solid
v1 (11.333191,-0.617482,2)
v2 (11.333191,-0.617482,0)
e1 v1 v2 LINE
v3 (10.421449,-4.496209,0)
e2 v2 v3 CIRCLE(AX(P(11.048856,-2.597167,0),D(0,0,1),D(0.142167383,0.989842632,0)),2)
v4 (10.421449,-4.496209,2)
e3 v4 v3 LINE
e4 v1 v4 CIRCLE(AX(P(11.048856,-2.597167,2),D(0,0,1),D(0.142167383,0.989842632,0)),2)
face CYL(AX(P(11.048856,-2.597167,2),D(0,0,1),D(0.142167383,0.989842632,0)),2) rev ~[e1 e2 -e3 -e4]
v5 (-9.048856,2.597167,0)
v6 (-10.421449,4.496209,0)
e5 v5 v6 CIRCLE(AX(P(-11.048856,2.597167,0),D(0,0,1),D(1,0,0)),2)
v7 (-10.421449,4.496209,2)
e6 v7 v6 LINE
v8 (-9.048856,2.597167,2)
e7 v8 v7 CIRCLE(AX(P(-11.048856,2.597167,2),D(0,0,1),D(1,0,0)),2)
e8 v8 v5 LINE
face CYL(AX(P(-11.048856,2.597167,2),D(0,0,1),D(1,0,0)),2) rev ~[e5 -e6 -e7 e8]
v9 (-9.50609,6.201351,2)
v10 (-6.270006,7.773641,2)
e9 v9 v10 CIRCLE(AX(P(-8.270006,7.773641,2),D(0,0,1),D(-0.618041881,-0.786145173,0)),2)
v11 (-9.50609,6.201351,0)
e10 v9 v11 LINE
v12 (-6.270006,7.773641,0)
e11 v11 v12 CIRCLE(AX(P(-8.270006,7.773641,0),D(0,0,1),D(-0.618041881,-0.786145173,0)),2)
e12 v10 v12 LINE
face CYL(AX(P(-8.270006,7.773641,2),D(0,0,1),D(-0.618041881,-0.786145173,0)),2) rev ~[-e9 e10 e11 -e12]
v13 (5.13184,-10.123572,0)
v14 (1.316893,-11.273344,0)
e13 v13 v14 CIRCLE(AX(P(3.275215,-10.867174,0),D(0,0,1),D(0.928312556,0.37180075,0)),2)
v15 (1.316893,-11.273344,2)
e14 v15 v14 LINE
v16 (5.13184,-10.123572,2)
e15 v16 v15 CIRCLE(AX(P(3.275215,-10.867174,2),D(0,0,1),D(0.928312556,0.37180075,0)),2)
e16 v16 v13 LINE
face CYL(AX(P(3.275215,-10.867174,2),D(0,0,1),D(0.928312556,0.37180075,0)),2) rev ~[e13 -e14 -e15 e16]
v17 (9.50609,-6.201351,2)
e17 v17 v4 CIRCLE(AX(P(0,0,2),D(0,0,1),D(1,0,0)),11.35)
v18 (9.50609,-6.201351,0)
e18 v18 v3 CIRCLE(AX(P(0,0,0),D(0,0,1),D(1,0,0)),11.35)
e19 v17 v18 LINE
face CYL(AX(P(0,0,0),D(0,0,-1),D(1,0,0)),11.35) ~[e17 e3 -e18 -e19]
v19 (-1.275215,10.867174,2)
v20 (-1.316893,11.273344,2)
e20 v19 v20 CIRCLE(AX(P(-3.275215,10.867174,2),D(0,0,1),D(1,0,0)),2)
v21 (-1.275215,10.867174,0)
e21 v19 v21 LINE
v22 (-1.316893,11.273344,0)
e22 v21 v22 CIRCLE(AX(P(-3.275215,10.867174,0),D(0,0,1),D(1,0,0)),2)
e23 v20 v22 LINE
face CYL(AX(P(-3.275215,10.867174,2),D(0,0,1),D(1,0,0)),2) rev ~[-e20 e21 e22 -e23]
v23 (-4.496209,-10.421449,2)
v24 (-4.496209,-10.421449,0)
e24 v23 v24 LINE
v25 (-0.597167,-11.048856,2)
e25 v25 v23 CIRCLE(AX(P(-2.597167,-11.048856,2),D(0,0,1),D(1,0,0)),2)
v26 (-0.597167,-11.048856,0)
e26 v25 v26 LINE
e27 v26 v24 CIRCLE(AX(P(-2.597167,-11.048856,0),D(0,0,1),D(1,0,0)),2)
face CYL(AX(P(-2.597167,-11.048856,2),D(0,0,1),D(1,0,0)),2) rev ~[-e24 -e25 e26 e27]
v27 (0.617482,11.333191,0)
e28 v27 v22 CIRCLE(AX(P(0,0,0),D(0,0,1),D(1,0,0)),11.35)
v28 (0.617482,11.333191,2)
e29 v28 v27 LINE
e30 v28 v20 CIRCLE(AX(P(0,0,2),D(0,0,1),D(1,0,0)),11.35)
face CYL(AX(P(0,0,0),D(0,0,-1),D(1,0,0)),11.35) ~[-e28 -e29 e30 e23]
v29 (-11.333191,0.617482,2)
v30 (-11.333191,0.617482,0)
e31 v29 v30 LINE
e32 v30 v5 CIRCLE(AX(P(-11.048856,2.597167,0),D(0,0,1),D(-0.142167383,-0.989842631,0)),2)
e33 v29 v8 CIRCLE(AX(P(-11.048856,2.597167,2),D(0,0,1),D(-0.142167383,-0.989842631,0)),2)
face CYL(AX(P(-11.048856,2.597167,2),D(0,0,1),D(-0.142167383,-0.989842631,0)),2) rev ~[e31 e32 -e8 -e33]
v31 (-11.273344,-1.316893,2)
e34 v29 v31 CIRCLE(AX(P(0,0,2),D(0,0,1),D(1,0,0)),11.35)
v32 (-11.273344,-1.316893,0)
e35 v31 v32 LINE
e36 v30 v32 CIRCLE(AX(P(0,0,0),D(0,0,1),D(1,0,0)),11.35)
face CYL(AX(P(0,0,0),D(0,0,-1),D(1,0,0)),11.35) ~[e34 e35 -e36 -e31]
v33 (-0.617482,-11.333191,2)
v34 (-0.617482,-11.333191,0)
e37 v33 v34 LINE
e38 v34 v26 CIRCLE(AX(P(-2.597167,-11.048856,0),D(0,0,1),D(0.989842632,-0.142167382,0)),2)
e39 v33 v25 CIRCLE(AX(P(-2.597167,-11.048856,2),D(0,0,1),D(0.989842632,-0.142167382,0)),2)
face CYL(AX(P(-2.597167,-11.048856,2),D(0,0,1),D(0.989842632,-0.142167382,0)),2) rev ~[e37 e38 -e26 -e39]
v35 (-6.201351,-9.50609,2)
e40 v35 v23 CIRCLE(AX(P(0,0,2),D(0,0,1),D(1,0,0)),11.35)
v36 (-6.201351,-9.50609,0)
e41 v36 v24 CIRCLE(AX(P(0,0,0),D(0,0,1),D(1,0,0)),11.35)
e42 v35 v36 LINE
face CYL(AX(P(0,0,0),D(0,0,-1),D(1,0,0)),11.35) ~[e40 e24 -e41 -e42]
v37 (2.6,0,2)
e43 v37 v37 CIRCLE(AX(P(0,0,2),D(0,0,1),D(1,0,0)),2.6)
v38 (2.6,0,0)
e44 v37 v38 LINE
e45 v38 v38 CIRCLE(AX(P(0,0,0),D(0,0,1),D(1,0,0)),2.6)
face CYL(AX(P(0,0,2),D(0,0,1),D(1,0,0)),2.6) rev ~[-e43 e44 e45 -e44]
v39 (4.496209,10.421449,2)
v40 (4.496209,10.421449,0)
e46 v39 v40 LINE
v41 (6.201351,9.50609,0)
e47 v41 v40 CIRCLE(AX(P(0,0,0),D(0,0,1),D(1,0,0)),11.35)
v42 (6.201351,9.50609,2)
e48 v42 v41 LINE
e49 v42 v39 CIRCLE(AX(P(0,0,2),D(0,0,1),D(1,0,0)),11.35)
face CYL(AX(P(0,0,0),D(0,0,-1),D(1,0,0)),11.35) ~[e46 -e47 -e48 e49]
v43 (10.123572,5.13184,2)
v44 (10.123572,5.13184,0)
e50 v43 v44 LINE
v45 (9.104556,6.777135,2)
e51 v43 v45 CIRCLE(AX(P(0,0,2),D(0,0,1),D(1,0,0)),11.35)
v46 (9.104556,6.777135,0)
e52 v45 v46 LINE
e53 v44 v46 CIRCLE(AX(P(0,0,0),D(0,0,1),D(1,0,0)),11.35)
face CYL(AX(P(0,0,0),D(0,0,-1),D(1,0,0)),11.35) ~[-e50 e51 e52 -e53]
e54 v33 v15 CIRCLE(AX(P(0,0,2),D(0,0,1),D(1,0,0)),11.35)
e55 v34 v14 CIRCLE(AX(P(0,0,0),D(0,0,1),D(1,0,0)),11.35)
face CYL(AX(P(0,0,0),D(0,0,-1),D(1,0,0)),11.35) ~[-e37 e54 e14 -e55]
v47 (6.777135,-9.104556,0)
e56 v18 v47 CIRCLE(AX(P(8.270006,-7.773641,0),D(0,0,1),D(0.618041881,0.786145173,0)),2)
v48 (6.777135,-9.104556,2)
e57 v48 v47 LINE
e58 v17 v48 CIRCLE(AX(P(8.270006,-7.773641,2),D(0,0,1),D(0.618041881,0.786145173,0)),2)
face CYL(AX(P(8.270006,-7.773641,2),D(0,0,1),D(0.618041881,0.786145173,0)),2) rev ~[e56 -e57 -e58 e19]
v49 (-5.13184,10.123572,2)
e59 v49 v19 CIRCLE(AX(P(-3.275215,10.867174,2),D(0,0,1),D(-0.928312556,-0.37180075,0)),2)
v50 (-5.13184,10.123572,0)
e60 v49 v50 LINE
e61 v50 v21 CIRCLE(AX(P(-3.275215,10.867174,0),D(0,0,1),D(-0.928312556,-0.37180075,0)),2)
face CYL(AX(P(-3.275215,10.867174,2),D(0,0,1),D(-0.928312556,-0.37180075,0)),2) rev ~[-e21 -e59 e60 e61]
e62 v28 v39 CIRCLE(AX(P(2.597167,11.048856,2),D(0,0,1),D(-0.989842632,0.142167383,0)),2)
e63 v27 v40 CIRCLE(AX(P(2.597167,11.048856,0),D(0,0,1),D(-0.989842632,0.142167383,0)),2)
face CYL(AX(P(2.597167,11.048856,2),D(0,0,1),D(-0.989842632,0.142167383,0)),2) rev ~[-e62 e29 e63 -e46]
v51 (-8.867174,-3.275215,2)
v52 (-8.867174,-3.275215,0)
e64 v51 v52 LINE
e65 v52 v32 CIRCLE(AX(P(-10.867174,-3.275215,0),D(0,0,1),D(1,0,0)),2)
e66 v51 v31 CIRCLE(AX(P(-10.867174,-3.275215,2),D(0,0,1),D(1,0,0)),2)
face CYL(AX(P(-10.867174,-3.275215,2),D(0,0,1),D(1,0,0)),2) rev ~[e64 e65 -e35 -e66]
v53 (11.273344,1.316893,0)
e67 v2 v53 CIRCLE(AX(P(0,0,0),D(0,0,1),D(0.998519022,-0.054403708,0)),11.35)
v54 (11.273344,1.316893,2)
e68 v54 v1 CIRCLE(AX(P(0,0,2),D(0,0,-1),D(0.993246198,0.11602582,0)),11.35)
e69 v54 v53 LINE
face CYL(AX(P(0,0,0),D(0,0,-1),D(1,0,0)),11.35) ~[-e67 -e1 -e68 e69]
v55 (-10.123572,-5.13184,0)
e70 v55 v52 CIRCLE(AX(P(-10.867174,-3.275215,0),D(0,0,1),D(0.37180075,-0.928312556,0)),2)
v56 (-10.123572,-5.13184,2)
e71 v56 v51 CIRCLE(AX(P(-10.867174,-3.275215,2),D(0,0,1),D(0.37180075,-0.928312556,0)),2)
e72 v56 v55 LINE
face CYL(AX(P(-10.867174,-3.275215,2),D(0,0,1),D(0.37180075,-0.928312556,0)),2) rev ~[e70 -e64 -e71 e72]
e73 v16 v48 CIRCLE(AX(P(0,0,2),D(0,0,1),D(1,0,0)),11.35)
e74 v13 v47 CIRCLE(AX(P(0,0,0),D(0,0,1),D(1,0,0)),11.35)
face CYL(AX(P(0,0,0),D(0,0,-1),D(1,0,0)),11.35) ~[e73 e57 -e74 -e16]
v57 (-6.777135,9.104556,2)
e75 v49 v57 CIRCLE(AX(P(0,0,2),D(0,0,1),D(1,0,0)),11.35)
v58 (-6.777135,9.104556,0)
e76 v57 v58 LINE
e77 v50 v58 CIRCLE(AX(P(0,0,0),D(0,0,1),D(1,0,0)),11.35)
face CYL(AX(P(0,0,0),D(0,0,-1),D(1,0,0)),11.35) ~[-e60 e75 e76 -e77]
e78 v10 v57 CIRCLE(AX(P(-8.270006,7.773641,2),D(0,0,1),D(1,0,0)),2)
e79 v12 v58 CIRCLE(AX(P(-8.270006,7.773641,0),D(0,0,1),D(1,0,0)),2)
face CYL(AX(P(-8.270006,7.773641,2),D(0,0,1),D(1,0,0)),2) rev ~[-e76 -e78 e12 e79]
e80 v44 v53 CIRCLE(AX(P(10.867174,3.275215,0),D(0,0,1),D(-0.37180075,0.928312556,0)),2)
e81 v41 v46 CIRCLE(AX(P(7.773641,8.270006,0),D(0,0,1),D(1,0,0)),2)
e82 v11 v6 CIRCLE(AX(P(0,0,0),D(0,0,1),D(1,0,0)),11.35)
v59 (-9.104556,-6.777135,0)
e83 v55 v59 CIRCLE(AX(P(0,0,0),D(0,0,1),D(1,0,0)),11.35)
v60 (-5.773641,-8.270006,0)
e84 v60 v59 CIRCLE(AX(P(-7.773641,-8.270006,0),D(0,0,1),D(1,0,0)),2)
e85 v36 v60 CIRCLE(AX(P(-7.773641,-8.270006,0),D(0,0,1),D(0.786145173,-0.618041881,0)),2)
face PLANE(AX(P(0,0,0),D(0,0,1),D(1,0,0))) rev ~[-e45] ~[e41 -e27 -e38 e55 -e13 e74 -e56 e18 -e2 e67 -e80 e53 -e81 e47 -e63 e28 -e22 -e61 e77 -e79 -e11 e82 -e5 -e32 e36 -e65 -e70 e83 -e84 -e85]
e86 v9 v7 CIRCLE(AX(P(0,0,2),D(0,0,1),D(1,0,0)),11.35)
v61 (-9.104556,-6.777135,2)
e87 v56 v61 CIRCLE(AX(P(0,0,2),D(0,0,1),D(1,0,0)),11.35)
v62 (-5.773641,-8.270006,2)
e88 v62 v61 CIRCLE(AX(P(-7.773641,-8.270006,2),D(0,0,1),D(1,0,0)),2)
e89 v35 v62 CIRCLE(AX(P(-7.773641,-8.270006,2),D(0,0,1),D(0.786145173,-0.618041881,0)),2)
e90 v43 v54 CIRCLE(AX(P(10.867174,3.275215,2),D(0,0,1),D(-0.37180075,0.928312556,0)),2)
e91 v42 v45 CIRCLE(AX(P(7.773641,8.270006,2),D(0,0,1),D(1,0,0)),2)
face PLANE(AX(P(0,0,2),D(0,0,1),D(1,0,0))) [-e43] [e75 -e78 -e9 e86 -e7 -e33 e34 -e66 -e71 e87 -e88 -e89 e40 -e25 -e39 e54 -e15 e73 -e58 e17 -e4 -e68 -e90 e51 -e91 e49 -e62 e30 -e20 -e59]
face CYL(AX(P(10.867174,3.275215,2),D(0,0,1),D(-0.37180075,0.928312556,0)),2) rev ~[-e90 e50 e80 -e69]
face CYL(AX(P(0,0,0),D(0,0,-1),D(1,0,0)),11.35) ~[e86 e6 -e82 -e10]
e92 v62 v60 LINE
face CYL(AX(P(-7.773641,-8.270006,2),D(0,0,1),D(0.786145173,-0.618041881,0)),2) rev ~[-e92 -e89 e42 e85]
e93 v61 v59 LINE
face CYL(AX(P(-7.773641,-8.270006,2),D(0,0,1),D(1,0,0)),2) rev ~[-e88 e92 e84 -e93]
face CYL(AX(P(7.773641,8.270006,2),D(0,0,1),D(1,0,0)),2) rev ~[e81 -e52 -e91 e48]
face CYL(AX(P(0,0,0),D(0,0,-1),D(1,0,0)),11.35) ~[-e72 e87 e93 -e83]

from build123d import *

# Parameters (mm, degrees)
F0_R     = 11.35
F1_DEPTH = 2
F2_R     = 2.6
F3_DEPTH = 25


# Not quite as in the source:
# - a feature names something its author has since deleted; it is built from what else it names


with BuildPart() as f1:
    # F0 (on Top) → F1 (new body)
    with BuildSketch(Plane.XY):
        Circle(F0_R)
    extrude(amount=F1_DEPTH)

    # F2 (on face) → F3 (cut)
    with BuildSketch(Plane.XY.offset(2)):
        with BuildLine():
            ThreePointArc((9.1045560576, 6.7771350137), (7.7736409673, 8.2700064155), (6.2013506213, 9.506090178))
            ThreePointArc((6.2013506213, 9.506090178), (6.4038363916, 6.8127365625), (9.1045560576, 6.7771350137))
        make_face()
        with BuildLine():
            ThreePointArc((9.1045560576, 6.7771350137), (9.5987204424, 7.4520303097), (9.7736409673, 8.2700064155))
            ThreePointArc((9.7736409673, 8.2700064155), (8.4276361156, 10.1600567709), (6.2013506213, 9.506090178))
            ThreePointArc((6.2013506213, 9.506090178), (7.7736409673, 8.2700064155), (9.1045560576, 6.7771350137))
        make_face()
        with BuildLine():
            ThreePointArc((0.6174820868, 11.3331908954), (2.1395167155, 9.1019211282), (4.4962093293, 10.4214491155))
            ThreePointArc((4.4962093293, 10.4214491155), (2.5971673498, 11.0488561289), (0.6174820868, 11.3331908954))
        make_face()
        with BuildLine():
            ThreePointArc((0.6174820868, 11.3331908954), (2.5971673498, 11.0488561289), (4.4962093293, 10.4214491155))
            ThreePointArc((4.4962093293, 10.4214491155), (4.5717665445, 10.73111721), (4.5971673498, 11.0488561289))
            ThreePointArc((4.5971673498, 11.0488561289), (2.7396971257, 13.04377098), (0.6174820868, 11.3331908954))
        make_face()
        with BuildLine():
            ThreePointArc((-5.1318402741, 10.1235722648), (-3.2752151616, 10.8671737653), (-1.3168930579, 11.2733443429))
            ThreePointArc((-1.3168930579, 11.2733443429), (-3.8523455866, 12.7820942526), (-5.1318402741, 10.1235722648))
        make_face()
        with BuildLine():
            ThreePointArc((-1.2752151616, 10.8671737653), (-1.2856619194, 11.0713254155), (-1.3168930579, 11.2733443429))
            ThreePointArc((-1.3168930579, 11.2733443429), (-3.2752151616, 10.8671737653), (-5.1318402741, 10.1235722648))
            ThreePointArc((-5.1318402741, 10.1235722648), (-2.8965663963, 8.9033445689), (-1.2752151616, 10.8671737653))
        make_face()
        with BuildLine():
            ThreePointArc((-9.506090178, 6.2013506213), (-8.2700064155, 7.7736409673), (-6.7771350137, 9.1045560576))
            ThreePointArc((-6.7771350137, 9.1045560576), (-9.7272762684, 9.143445543), (-9.506090178, 6.2013506213))
        make_face()
        with BuildLine():
            ThreePointArc((-6.2700064155, 7.7736409673), (-6.4010838912, 8.4857705891), (-6.7771350137, 9.1045560576))
            ThreePointArc((-6.7771350137, 9.1045560576), (-8.2700064155, 7.7736409673), (-9.506090178, 6.2013506213))
            ThreePointArc((-9.506090178, 6.2013506213), (-7.3959833966, 5.97472914), (-6.2700064155, 7.7736409673))
        make_face()
        with BuildLine():
            ThreePointArc((-11.3331908954, 0.6174820868), (-11.0488561289, 2.5971673498), (-10.4214491155, 4.4962093293))
            ThreePointArc((-10.4214491155, 4.4962093293), (-12.9957911296, 3.0548179842), (-11.3331908954, 0.6174820868))
        make_face()
        with BuildLine():
            ThreePointArc((-9.0488561289, 2.5971673498), (-9.427928304, 3.7687444863), (-10.4214491155, 4.4962093293))
            ThreePointArc((-10.4214491155, 4.4962093293), (-11.0488561289, 2.5971673498), (-11.3331908954, 0.6174820868))
            ThreePointArc((-11.3331908954, 0.6174820868), (-9.7390220808, 1.0857657597), (-9.0488561289, 2.5971673498))
        make_face()
        with BuildLine():
            ThreePointArc((11.2733443429, 1.3168930579), (10.8671737653, 3.2752151616), (10.1235722648, 5.1318402741))
            ThreePointArc((10.1235722648, 5.1318402741), (8.952253278, 2.6980847366), (11.2733443429, 1.3168930579))
        make_face()
        with BuildLine():
            ThreePointArc((12.8671737653, 3.2752151616), (11.9880655975, 4.9315972131), (10.1235722648, 5.1318402741))
            ThreePointArc((10.1235722648, 5.1318402741), (10.8671737653, 3.2752151616), (11.2733443429, 1.3168930579))
            ThreePointArc((11.2733443429, 1.3168930579), (12.4183573707, 2.0127455887), (12.8671737653, 3.2752151616))
        make_face()
        with BuildLine():
            ThreePointArc((10.4214491155, -4.4962093293), (11.0488561289, -2.5971673498), (11.3331908954, -0.6174820868))
            ThreePointArc((11.3331908954, -0.6174820868), (9.1019211282, -2.1395167155), (10.4214491155, -4.4962093293))
        make_face()
        with BuildLine():
            ThreePointArc((13.0488561289, -2.5971673498), (12.560257719, -1.2873333018), (11.3331908954, -0.6174820868))
            ThreePointArc((11.3331908954, -0.6174820868), (11.0488561289, -2.5971673498), (10.4214491155, -4.4962093293))
            ThreePointArc((10.4214491155, -4.4962093293), (12.2204332653, -4.2180951747), (13.0488561289, -2.5971673498))
        make_face()
        with BuildLine():
            ThreePointArc((-4.4962093293, -10.4214491155), (-3.0548179842, -12.9957911296), (-0.6174820868, -11.3331908954))
            ThreePointArc((-0.6174820868, -11.3331908954), (-2.5971673498, -11.0488561289), (-4.4962093293, -10.4214491155))
        make_face()
        with BuildLine():
            ThreePointArc((-4.4962093293, -10.4214491155), (-2.5971673498, -11.0488561289), (-0.6174820868, -11.3331908954))
            ThreePointArc((-0.6174820868, -11.3331908954), (-0.6022524988, -11.1913859047), (-0.5971673498, -11.0488561289))
            ThreePointArc((-0.5971673498, -11.0488561289), (-2.2794284309, -9.0742569343), (-4.4962093293, -10.4214491155))
        make_face()
        with BuildLine():
            ThreePointArc((-10.1235722648, -5.1318402741), (-10.8671737653, -3.2752151616), (-11.2733443429, -1.3168930579))
            ThreePointArc((-11.2733443429, -1.3168930579), (-12.7820942526, -3.8523455866), (-10.1235722648, -5.1318402741))
        make_face()
        with BuildLine():
            ThreePointArc((-8.8671737653, -3.2752151616), (-9.6047041924, -1.7240315562), (-11.2733443429, -1.3168930579))
            ThreePointArc((-11.2733443429, -1.3168930579), (-10.8671737653, -3.2752151616), (-10.1235722648, -5.1318402741))
            ThreePointArc((-10.1235722648, -5.1318402741), (-9.2107917138, -4.3961069938), (-8.8671737653, -3.2752151616))
        make_face()
        with BuildLine():
            ThreePointArc((-6.2013506213, -9.506090178), (-7.7736409673, -8.2700064155), (-9.1045560576, -6.7771350137))
            ThreePointArc((-9.1045560576, -6.7771350137), (-9.143445543, -9.7272762684), (-6.2013506213, -9.506090178))
        make_face()
        with BuildLine():
            ThreePointArc((-5.7736409673, -8.2700064155), (-6.9556648615, -6.4449269404), (-9.1045560576, -6.7771350137))
            ThreePointArc((-9.1045560576, -6.7771350137), (-7.7736409673, -8.2700064155), (-6.2013506213, -9.506090178))
            ThreePointArc((-6.2013506213, -9.506090178), (-5.8835906119, -8.9240015638), (-5.7736409673, -8.2700064155))
        make_face()
        with BuildLine():
            ThreePointArc((6.7771350137, -9.1045560576), (8.2700064155, -7.7736409673), (9.506090178, -6.2013506213))
            ThreePointArc((9.506090178, -6.2013506213), (6.8127365625, -6.4038363916), (6.7771350137, -9.1045560576))
        make_face()
        with BuildLine():
            ThreePointArc((10.2700064155, -7.7736409673), (10.0689182428, -6.8996179484), (9.506090178, -6.2013506213))
            ThreePointArc((9.506090178, -6.2013506213), (8.2700064155, -7.7736409673), (6.7771350137, -9.1045560576))
            ThreePointArc((6.7771350137, -9.1045560576), (8.9821360372, -9.6425634916), (10.2700064155, -7.7736409673))
        make_face()
        with BuildLine():
            ThreePointArc((1.3168930579, -11.2733443429), (3.2752151616, -10.8671737653), (5.1318402741, -10.1235722648))
            ThreePointArc((5.1318402741, -10.1235722648), (2.6980847366, -8.952253278), (1.3168930579, -11.2733443429))
        make_face()
        with BuildLine():
            ThreePointArc((5.2752151616, -10.8671737653), (5.239044358, -10.488525), (5.1318402741, -10.1235722648))
            ThreePointArc((5.1318402741, -10.1235722648), (3.2752151616, -10.8671737653), (1.3168930579, -11.2733443429))
            ThreePointArc((1.3168930579, -11.2733443429), (3.4793668118, -12.8567270075), (5.2752151616, -10.8671737653))
        make_face()
        Circle(F2_R)
    extrude(amount=-F3_DEPTH, mode=Mode.SUBTRACT)


solid = f1.part
